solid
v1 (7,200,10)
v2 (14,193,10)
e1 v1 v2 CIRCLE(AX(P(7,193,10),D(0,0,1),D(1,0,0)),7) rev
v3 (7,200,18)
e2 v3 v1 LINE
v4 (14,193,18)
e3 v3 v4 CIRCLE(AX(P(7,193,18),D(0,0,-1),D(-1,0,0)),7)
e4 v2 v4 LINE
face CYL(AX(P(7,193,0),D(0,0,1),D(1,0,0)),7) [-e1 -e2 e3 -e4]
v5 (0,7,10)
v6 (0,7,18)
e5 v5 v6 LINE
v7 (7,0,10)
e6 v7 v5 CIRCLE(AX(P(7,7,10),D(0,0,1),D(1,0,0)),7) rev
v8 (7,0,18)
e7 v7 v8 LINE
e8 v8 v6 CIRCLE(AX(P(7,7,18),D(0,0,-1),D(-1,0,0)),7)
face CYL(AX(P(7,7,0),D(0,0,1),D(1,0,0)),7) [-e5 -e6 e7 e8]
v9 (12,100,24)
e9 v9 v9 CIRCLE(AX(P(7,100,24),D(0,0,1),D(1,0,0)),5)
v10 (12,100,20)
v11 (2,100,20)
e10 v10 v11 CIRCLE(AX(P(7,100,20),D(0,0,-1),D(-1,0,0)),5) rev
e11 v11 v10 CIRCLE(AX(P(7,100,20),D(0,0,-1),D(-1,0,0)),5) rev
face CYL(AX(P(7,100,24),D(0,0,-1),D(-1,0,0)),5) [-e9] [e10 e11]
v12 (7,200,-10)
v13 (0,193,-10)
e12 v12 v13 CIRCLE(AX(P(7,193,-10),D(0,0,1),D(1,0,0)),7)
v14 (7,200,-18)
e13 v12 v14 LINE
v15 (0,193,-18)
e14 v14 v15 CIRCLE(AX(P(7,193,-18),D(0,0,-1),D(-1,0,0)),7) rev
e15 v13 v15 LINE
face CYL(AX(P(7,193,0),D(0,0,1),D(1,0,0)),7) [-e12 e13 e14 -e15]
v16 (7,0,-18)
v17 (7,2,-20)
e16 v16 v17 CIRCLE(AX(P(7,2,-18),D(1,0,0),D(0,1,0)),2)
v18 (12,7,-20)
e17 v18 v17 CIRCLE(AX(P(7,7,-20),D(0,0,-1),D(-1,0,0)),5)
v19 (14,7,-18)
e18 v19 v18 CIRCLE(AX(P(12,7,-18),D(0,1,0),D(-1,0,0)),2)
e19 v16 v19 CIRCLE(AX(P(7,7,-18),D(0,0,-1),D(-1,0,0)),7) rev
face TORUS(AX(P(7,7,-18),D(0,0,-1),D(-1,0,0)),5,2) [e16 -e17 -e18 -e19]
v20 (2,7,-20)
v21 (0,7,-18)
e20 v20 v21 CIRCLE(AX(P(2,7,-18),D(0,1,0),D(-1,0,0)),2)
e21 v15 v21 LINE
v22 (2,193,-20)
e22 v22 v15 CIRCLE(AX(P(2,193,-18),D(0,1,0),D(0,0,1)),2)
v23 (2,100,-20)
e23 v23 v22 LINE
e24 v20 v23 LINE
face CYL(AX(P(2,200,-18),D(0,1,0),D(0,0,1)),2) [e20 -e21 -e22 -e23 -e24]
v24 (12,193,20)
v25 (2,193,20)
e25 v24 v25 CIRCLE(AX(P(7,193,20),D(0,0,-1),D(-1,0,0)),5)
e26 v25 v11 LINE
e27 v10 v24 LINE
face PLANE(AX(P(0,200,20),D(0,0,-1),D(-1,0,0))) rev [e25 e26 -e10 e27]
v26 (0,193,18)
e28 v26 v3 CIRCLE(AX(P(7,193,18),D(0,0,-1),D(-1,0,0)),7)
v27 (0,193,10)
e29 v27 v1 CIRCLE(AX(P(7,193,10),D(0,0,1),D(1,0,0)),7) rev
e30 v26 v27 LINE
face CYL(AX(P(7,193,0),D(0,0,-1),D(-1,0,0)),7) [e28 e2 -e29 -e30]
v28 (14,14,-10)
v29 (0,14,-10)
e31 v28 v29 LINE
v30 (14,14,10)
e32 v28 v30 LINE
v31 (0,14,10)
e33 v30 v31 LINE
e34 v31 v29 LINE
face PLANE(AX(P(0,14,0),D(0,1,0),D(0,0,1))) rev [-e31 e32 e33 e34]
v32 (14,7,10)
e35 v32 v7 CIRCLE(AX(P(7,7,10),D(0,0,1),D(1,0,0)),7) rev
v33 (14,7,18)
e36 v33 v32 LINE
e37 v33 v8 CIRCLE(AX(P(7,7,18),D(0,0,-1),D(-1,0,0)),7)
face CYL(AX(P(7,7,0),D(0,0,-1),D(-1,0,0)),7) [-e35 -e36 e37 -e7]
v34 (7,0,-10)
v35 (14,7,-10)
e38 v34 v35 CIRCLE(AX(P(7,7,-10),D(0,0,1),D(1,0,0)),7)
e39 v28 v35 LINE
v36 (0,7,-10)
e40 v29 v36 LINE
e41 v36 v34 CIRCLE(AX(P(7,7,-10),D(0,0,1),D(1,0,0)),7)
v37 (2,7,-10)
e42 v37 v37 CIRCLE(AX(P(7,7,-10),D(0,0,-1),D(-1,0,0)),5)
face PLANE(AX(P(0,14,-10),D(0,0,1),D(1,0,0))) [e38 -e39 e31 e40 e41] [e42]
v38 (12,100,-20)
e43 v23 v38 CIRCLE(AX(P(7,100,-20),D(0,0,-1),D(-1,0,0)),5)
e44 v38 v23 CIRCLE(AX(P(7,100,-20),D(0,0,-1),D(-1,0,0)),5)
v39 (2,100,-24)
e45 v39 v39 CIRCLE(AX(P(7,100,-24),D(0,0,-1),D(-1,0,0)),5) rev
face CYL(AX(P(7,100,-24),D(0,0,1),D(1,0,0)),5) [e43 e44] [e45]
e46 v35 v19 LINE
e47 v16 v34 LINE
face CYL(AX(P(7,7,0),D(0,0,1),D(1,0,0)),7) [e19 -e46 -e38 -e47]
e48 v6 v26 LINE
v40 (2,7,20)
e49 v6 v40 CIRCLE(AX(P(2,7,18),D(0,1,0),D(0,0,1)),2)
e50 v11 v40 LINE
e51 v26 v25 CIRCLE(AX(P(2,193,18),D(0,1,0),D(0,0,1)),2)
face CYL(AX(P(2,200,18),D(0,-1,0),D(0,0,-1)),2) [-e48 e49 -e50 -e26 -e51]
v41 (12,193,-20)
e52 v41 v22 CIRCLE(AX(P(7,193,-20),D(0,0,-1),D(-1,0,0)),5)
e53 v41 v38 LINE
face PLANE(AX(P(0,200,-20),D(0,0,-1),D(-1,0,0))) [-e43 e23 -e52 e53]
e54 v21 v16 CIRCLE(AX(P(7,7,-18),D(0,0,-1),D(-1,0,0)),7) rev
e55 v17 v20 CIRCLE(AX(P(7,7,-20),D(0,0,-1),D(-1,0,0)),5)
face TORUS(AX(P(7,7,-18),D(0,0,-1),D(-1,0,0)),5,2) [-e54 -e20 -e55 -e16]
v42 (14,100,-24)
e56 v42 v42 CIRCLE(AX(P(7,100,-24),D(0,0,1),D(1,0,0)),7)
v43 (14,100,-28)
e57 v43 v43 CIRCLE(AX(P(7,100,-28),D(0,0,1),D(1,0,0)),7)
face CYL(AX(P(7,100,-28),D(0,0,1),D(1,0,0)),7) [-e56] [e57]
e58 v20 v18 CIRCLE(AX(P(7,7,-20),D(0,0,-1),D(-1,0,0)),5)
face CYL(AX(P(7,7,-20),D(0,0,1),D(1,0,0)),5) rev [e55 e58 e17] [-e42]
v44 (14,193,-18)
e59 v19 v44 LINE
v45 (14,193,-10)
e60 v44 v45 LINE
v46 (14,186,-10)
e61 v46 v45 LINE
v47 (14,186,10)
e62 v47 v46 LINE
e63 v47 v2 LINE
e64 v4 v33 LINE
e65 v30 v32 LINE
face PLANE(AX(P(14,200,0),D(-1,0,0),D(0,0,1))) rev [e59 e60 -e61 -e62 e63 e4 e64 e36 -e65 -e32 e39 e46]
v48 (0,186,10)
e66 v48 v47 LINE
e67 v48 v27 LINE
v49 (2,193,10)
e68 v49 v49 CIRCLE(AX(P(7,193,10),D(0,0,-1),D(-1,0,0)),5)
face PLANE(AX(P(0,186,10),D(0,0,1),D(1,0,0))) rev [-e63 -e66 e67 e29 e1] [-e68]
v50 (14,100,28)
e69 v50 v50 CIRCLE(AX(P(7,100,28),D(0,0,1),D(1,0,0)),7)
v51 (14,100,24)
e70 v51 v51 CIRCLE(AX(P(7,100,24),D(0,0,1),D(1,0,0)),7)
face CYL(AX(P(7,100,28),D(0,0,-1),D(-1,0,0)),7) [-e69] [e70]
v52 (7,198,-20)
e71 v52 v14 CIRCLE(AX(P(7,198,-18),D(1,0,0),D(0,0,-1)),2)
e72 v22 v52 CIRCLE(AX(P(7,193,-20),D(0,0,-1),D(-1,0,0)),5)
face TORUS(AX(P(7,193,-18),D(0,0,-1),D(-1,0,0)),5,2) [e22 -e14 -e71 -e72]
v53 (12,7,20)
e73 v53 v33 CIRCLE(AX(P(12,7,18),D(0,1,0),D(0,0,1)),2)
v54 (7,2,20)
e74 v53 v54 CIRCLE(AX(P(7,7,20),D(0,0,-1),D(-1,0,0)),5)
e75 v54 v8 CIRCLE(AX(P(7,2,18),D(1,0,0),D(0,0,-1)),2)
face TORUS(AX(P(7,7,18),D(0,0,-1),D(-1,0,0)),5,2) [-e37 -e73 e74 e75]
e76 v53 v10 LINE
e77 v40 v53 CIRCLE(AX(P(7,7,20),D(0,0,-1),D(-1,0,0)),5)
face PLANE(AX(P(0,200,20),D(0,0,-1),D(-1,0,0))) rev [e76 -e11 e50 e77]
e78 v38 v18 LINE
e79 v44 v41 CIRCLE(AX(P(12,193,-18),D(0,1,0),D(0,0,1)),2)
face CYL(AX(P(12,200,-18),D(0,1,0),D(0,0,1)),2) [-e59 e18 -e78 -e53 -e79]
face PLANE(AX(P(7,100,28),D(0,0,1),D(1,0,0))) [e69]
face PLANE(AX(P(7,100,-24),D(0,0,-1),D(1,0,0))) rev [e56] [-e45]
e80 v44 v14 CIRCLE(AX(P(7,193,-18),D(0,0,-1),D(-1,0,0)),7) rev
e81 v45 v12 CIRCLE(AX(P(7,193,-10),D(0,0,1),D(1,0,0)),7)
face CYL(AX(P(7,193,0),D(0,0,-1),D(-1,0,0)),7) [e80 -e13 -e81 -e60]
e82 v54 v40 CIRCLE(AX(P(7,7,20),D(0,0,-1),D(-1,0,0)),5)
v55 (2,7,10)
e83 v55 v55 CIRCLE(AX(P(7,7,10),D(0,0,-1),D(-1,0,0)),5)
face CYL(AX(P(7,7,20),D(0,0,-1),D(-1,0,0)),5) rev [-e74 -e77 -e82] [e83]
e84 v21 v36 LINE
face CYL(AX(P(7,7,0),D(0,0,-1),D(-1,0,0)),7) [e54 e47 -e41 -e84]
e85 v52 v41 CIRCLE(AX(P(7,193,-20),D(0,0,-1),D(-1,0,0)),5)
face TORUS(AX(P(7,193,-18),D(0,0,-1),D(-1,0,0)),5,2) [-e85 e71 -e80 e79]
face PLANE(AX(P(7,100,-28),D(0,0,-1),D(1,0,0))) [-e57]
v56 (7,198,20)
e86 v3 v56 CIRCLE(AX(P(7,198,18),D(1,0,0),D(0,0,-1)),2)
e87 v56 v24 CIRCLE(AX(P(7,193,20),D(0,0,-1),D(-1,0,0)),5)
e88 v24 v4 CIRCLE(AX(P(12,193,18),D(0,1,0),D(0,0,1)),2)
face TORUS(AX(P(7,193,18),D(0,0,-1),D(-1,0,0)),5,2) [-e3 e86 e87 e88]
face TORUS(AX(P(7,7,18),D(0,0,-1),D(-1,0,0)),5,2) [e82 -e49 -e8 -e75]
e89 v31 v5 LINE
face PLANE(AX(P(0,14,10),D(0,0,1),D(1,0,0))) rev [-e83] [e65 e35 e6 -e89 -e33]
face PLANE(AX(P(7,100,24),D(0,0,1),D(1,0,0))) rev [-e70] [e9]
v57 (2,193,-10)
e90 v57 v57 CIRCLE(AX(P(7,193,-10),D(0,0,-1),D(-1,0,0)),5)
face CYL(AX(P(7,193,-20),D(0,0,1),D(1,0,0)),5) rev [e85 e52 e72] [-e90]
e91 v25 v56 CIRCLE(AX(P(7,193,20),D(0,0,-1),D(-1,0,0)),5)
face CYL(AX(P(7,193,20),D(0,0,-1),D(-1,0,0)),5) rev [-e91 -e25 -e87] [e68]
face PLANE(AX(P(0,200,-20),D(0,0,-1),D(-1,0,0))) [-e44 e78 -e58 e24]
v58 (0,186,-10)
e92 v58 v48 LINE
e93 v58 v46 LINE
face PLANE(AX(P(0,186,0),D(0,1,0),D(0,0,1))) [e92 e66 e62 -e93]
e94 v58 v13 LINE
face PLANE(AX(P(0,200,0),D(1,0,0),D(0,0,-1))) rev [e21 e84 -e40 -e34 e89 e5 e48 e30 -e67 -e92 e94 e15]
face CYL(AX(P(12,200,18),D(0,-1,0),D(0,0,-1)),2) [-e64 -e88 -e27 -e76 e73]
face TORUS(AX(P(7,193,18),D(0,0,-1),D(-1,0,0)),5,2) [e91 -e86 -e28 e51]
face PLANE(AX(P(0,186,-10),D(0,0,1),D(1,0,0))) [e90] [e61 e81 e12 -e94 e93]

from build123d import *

# Parameters (mm, degrees)
SKETCH1_W           = 14
SKETCH1_H           = 20
BOSS_EXTRUDE1_DEPTH = 200
SKETCH2_W           = 14
SKETCH2_H           = 10
CUT_EXTRUDE1_DEPTH  = 14
SKETCH5_R           = 5
CUT_EXTRUDE4_DEPTH  = 10
SKETCH4_W           = 14
SKETCH4_H           = 10
CUT_EXTRUDE3_DEPTH  = 14
SKETCH6_R           = 5
CUT_EXTRUDE5_DEPTH  = 10
FILLET3_R           = 7
SKETCH7_R           = 5
BOSS_EXTRUDE2_DEPTH = 4
SKETCH8_R           = 7
BOSS_EXTRUDE3_DEPTH = 4
FILLET2_R           = 2


with BuildPart() as part:
    # Sketch1 → Boss-Extrude1 (new body)
    with BuildSketch(Plane(origin=(0, 0, 0), x_dir=(1, 0, 0), z_dir=(0, 1, 0))):
        with Locations((7, -10)):
            Rectangle(SKETCH1_W, SKETCH1_H)
    boss_extrude1 = extrude(amount=BOSS_EXTRUDE1_DEPTH)

    # Sketch2 → Cut-Extrude1 (cut)
    with BuildSketch(Plane.XZ):
        with Locations((7, 5)):
            Rectangle(SKETCH2_W, SKETCH2_H)
    cut_extrude1 = extrude(amount=-CUT_EXTRUDE1_DEPTH, mode=Mode.SUBTRACT)

    # Sketch5 → Cut-Extrude4 (cut)
    with BuildSketch(Plane(origin=(0, 0, 10), x_dir=(-1, 0, 0), z_dir=(0, 0, -1))):
        with Locations((-7, 7)):
            Circle(SKETCH5_R)
    cut_extrude4 = extrude(amount=-CUT_EXTRUDE4_DEPTH, mode=Mode.SUBTRACT)

    # Sketch4 → Cut-Extrude3 (cut)
    with BuildSketch(Plane(origin=(0, 200, 0), x_dir=(1, 0, 0), z_dir=(0, 1, 0))):
        with Locations((7, -5)):
            Rectangle(SKETCH4_W, SKETCH4_H)
    cut_extrude3 = extrude(amount=-CUT_EXTRUDE3_DEPTH, mode=Mode.SUBTRACT)

    # Sketch6 → Cut-Extrude5 (cut)
    with BuildSketch(Plane(origin=(0, 0, 10), x_dir=(-1, 0, 0), z_dir=(0, 0, -1))):
        with Locations((-7, 193)):
            Circle(SKETCH6_R)
    cut_extrude5 = extrude(amount=-CUT_EXTRUDE5_DEPTH, mode=Mode.SUBTRACT)

    # Mirror1: Boss-Extrude1, Cut-Extrude1, Cut-Extrude4, Cut-Extrude3, Cut-Extrude5 across plane
    add(boss_extrude1.mirror(Plane(origin=(0, 200, 0), x_dir=(1, 0, 0), z_dir=(0, 0, 1))))
    add(cut_extrude1.mirror(Plane(origin=(0, 200, 0), x_dir=(1, 0, 0), z_dir=(0, 0, 1))), mode=Mode.SUBTRACT)
    add(cut_extrude4.mirror(Plane(origin=(0, 200, 0), x_dir=(1, 0, 0), z_dir=(0, 0, 1))), mode=Mode.SUBTRACT)
    add(cut_extrude3.mirror(Plane(origin=(0, 200, 0), x_dir=(1, 0, 0), z_dir=(0, 0, 1))), mode=Mode.SUBTRACT)
    add(cut_extrude5.mirror(Plane(origin=(0, 200, 0), x_dir=(1, 0, 0), z_dir=(0, 0, 1))), mode=Mode.SUBTRACT)

    # Fillet3
    fillet3_edges = [part.edges().sort_by_distance(p)[0] for p in [
        (0, 200, 15),
        (14, 200, 15),
        (0, 200, -15),
        (14, 200, -15),
        (0, 0, -15),
        (14, 0, -15),
        (0, 0, 15),
        (14, 0, 15),
    ]]
    fillet(fillet3_edges, radius=FILLET3_R - 0.0001)  # a hair under: the kernel refuses the full size

    # Sketch7 → Boss-Extrude2 (add)
    with BuildSketch(Plane.XY.offset(20)):
        with Locations(Location((7, 100, 0), (0, 0, 180))):
            Circle(SKETCH7_R)
    boss_extrude2 = extrude(amount=BOSS_EXTRUDE2_DEPTH)

    # Sketch8 → Boss-Extrude3 (add)
    with BuildSketch(Plane.XY.offset(24)):
        with Locations((7, 100)):
            Circle(SKETCH8_R)
    boss_extrude3 = extrude(amount=BOSS_EXTRUDE3_DEPTH)

    # Mirror2: Boss-Extrude2, Boss-Extrude3 across plane
    add(boss_extrude2.mirror(Plane.XY))
    add(boss_extrude3.mirror(Plane.XY))

    # Fillet2
    fillet2_edges = [part.edges().sort_by_distance(p)[0] for p in [
        (14, 100, 20),
        (0, 100, 20),
        (0, 100, -20),
        (14, 100, -20),
        (11.949776758, 2.050223242, 20),
        (11.949776758, 197.949776758, 20),
        (11.949776758, 2.050223242, -20),
        (11.949776758, 197.949776758, -20),
        (2.050223242, 197.949776758, -20),
    ]]
    fillet(fillet2_edges, radius=FILLET2_R - 0.0001)  # a hair under: the kernel refuses the full size


solid = part.part
